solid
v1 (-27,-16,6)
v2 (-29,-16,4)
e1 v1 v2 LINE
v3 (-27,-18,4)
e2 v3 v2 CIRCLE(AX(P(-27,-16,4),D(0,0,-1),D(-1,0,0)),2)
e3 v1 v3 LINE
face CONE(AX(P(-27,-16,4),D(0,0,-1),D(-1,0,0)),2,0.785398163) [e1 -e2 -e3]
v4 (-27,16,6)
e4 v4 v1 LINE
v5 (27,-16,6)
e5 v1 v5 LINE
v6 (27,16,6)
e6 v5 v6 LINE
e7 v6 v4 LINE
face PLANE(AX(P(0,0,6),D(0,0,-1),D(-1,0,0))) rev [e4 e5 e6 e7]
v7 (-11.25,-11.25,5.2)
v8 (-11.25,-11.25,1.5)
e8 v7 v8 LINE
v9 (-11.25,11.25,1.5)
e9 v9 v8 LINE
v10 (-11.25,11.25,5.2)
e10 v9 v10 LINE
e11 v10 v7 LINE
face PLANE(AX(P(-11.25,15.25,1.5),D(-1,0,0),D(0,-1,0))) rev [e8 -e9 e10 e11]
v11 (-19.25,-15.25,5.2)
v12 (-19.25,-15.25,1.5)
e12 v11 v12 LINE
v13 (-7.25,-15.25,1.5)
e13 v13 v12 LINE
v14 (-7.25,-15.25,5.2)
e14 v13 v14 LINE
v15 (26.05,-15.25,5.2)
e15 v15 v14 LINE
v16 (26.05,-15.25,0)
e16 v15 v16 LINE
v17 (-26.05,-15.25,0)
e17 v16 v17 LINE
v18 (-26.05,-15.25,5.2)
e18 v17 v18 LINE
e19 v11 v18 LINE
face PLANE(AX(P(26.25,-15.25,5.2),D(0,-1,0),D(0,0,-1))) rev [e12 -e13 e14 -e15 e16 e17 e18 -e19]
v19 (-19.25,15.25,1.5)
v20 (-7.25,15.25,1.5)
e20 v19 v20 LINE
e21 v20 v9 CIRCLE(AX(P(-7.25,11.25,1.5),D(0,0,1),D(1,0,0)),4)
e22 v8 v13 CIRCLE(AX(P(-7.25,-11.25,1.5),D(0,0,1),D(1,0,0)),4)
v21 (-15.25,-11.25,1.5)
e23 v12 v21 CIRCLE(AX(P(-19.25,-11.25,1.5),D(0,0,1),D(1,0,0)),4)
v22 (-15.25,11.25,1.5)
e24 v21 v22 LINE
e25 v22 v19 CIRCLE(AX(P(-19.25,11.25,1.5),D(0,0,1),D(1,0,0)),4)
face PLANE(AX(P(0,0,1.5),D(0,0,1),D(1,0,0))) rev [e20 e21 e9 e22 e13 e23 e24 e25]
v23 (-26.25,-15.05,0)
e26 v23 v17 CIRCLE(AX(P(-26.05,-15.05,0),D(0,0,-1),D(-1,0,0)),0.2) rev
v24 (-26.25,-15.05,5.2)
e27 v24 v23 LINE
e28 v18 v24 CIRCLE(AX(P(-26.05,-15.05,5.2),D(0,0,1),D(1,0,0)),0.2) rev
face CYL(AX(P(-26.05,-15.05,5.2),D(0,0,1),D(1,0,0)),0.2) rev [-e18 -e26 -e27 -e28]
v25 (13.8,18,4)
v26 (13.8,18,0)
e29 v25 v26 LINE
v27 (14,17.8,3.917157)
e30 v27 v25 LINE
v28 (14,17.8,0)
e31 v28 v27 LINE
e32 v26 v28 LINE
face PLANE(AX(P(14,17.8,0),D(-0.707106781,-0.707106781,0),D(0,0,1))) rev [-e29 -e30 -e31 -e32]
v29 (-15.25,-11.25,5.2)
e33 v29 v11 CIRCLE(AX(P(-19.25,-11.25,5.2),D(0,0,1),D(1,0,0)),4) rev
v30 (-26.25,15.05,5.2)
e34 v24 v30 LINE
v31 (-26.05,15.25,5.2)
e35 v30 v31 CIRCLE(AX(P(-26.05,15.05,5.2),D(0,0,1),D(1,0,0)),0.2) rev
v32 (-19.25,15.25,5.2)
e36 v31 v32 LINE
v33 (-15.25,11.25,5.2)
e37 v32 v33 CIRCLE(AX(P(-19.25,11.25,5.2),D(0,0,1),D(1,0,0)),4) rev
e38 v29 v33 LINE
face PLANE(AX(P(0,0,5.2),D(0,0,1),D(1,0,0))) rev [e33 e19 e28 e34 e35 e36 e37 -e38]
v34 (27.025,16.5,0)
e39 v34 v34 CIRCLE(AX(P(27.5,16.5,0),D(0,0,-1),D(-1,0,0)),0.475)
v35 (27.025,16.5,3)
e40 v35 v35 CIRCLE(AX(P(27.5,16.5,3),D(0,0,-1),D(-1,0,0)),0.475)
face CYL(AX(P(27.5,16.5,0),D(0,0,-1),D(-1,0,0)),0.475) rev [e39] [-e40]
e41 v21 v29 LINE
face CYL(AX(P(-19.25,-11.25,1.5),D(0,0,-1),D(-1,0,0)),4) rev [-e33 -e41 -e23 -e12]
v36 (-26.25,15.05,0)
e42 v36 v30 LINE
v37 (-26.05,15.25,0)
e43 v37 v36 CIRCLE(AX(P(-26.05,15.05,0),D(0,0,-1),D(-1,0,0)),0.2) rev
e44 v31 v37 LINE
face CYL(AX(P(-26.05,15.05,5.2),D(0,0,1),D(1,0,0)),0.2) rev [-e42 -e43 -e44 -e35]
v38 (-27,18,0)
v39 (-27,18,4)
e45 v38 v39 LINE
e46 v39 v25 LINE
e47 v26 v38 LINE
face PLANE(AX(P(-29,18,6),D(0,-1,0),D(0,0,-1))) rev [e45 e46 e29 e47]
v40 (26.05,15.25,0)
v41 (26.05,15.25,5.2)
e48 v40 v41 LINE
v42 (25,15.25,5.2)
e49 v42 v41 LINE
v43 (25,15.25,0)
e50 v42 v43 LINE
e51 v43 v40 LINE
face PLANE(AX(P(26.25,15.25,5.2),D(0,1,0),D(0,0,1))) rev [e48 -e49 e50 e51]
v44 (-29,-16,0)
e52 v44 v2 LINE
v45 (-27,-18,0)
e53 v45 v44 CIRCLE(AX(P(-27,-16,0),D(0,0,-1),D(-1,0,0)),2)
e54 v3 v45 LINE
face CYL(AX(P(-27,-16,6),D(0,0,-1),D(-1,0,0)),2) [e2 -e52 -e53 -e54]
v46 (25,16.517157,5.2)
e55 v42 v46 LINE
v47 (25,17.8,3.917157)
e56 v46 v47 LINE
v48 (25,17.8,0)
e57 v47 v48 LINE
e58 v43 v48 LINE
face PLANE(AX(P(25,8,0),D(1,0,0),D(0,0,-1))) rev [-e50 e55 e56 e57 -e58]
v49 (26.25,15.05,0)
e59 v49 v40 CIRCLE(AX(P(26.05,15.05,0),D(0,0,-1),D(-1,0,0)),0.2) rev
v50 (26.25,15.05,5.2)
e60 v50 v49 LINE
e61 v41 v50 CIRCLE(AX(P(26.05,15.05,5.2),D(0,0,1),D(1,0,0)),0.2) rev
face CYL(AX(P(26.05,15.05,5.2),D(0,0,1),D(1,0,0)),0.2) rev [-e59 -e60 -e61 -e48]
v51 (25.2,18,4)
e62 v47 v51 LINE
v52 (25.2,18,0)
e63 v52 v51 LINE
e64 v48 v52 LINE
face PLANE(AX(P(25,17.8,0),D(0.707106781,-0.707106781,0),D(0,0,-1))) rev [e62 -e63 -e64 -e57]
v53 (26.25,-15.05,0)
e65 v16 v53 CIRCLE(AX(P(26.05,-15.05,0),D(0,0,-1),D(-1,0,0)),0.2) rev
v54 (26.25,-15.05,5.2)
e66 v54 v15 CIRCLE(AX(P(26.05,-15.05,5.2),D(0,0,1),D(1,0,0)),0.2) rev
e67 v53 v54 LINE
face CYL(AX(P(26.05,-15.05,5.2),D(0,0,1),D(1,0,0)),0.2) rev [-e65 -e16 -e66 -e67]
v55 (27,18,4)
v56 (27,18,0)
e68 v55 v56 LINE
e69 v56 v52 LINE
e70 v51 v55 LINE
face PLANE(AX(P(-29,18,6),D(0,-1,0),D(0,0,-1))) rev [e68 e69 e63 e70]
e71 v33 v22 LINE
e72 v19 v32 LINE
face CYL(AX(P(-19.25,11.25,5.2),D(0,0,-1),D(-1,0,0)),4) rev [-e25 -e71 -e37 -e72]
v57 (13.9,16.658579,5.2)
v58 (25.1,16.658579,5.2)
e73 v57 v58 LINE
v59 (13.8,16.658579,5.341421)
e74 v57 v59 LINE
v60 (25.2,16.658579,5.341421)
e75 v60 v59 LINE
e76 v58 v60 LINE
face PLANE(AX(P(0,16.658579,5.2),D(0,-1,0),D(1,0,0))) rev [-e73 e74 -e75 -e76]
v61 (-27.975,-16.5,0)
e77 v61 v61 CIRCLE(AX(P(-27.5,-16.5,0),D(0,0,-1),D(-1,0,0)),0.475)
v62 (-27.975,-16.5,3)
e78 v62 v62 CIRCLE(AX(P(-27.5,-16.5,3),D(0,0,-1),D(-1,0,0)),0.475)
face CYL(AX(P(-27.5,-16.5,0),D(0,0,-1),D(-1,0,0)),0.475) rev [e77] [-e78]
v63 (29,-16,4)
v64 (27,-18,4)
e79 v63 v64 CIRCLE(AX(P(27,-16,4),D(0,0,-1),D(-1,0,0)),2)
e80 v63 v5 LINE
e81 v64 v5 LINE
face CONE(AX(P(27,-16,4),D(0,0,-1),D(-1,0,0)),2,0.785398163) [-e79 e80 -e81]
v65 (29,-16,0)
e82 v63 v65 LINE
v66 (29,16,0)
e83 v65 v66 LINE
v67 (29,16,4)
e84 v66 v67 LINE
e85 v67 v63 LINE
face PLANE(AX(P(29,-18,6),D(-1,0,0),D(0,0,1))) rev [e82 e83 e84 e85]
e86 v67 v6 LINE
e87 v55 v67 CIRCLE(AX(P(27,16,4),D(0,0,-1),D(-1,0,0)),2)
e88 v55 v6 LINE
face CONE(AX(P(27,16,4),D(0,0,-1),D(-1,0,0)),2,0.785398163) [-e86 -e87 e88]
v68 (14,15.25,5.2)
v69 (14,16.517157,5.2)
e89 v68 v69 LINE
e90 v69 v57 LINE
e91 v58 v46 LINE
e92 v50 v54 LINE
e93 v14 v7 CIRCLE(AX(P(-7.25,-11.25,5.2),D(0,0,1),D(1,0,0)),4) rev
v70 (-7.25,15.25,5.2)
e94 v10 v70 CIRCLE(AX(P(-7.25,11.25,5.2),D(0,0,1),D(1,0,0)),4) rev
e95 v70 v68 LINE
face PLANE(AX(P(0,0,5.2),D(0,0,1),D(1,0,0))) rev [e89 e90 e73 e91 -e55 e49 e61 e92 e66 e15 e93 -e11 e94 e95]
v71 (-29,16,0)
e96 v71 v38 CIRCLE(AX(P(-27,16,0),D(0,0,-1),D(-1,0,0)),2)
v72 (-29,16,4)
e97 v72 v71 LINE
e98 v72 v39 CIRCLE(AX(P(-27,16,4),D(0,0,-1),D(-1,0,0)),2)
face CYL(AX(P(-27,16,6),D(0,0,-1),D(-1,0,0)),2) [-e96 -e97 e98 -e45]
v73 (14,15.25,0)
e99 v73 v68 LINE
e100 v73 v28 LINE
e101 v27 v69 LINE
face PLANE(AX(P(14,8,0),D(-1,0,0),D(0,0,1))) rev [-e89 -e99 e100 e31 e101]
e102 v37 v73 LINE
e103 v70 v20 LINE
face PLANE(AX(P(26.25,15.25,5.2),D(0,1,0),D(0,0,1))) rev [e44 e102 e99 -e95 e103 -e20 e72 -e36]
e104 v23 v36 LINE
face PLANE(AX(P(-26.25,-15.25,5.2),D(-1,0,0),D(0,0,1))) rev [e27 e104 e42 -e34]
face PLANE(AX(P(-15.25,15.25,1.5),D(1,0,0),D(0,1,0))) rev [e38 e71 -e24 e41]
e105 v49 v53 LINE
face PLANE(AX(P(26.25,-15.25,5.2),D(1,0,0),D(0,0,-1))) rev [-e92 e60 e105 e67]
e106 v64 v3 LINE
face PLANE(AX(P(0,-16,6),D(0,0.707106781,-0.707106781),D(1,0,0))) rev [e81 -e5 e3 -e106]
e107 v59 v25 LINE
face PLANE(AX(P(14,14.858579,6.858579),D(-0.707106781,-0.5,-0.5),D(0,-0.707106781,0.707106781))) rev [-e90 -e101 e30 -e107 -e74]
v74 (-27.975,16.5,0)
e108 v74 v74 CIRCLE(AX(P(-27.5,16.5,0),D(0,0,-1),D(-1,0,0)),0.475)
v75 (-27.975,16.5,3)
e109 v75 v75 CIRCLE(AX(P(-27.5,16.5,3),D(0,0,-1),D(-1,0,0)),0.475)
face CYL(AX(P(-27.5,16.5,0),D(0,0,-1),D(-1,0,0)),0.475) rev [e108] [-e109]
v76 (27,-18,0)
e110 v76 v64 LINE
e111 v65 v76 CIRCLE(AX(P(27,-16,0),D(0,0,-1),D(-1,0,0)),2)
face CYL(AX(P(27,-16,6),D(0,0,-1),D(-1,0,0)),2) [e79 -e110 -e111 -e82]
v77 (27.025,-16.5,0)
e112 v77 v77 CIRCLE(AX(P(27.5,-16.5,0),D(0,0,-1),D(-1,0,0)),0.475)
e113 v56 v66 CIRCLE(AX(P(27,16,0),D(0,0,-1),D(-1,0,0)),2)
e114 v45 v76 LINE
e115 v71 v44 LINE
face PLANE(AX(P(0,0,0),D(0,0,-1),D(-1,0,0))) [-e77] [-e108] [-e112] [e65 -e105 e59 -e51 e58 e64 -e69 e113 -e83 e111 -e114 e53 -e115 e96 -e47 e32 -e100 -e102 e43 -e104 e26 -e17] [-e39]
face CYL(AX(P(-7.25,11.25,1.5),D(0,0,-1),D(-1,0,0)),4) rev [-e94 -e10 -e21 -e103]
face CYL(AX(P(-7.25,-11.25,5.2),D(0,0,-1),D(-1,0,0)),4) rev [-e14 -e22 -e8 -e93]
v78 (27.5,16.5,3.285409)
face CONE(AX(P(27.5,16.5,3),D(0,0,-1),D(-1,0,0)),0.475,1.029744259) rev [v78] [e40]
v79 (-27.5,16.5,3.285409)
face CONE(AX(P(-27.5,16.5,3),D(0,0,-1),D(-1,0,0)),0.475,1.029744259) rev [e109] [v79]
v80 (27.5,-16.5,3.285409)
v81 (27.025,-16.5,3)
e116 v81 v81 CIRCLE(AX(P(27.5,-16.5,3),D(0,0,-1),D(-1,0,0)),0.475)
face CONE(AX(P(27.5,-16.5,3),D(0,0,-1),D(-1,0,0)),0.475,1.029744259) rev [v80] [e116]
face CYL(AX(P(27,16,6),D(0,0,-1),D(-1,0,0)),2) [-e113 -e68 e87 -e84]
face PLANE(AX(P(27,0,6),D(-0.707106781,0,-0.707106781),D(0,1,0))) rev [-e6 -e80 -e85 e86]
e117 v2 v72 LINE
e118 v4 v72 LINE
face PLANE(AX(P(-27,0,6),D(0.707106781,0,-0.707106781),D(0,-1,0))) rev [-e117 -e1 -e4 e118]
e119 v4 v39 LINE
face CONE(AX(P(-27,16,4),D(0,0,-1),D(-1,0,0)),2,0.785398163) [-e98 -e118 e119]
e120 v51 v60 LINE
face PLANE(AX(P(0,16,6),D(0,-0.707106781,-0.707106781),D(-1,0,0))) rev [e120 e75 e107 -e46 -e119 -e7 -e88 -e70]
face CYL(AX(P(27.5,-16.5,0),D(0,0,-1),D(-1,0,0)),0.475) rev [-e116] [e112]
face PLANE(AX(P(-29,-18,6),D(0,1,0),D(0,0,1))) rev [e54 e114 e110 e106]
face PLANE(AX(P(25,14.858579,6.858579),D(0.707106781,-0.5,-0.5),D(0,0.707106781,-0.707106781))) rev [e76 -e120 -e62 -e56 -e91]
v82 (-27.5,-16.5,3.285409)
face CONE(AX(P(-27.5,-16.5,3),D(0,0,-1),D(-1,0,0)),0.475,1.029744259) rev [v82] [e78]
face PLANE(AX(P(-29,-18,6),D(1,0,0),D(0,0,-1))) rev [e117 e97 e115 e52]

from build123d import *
from OCP.BRepFilletAPI import BRepFilletAPI_MakeChamfer

# Parameters (mm, degrees)
SKETCH_1_W          = 58
SKETCH_1_H          = 36
EXTRUDE_1_DEPTH     = 6
SKETCH_2_W          = 52.5
SKETCH_2_H          = 30.5
CUT_EXTRUDE_1_DEPTH = 5.2
FILLET_1_R          = 2
SKETCH_3_W          = 4
SKETCH_3_H          = 30.5
EXTRUDE_2_DEPTH     = 3.7
FILLET_2_R          = 4
CHAMFER_1_SIZE      = 2
SKETCH_4_W          = 11
SKETCH_4_H          = 5.2
CUT_EXTRUDE_2_DEPTH = 10
FILLET_3_R          = 0.2
CHAMFER_2_SIZE      = 0.2
CHAMFER_2_SIZE_2    = 0.141421356
M1_2X0_25_1_D       = 0.95
M1_2X0_25_1_DEPTH   = 3
M1_2X0_25_1_TIP     = 0.285408794


with BuildPart() as part:
    # 草图1 → 凸台-拉伸1 (new body)
    with BuildSketch(Plane.XY):
        Rectangle(SKETCH_1_W, SKETCH_1_H)
    extrude(amount=EXTRUDE_1_DEPTH)

    # 草图2 → 切除-拉伸1 (cut)
    with BuildSketch(Plane(origin=(0, 0, 0), x_dir=(-1, 0, 0), z_dir=(0, 0, -1))):
        Rectangle(SKETCH_2_W, SKETCH_2_H)
    extrude(amount=-CUT_EXTRUDE_1_DEPTH, mode=Mode.SUBTRACT)

    # 圆角1
    fillet_1_edges = [part.edges().sort_by_distance(p)[0] for p in [
        (29, -18, 3),
        (-29, -18, 3),
        (-29, 18, 3),
        (29, 18, 3),
    ]]
    fillet(fillet_1_edges, radius=FILLET_1_R)

    # 草图3 → 凸台-拉伸2 (add)
    with BuildSketch(Plane(origin=(0, 0, 5.2), x_dir=(-1, 0, 0), z_dir=(0, 0, -1))):
        with Locations((13.25, 0)):
            Rectangle(SKETCH_3_W, SKETCH_3_H)
    extrude(amount=EXTRUDE_2_DEPTH)

    # 圆角2
    fillet_2_edges = [part.edges().sort_by_distance(p)[0] for p in [
        (-15.25, -15.25, 3.35),
        (-15.25, 15.25, 3.35),
        (-11.25, 15.25, 3.35),
        (-11.25, -15.25, 3.35),
    ]]
    fillet(fillet_2_edges, radius=FILLET_2_R)

    # 倒角1
    chamfer_1_edges = [part.edges().sort_by_distance(p)[0] for p in [
        (-29, 0, 6),
        (0, 18, 6),
        (29, 0, 6),
        (0, -18, 6),
        (28.414213562, -17.414213562, 6),
        (28.414213562, 17.414213562, 6),
        (-28.414213562, -17.414213562, 6),
        (-28.414213562, 17.414213562, 6),
    ]]
    chamfer(chamfer_1_edges, length=CHAMFER_1_SIZE)

    # 草图4 → 切除-拉伸2 (cut)
    with BuildSketch(Plane(origin=(0, 18, 0), x_dir=(1, 0, 0), z_dir=(0, 1, 0))):
        with Locations((19.5, -2.6)):
            Rectangle(SKETCH_4_W, SKETCH_4_H)
    extrude(amount=-CUT_EXTRUDE_2_DEPTH, mode=Mode.SUBTRACT)

    # 圆角3
    fillet_3_edges = [part.edges().sort_by_distance(p)[0] for p in [
        (-26.25, 15.25, 2.6),
        (-26.25, -15.25, 2.6),
        (26.25, -15.25, 2.6),
        (26.25, 15.25, 2.6),
    ]]
    fillet(fillet_3_edges, radius=FILLET_3_R)

    # 倒角2
    chamfer_2_edges_1 = [part.edges().sort_by_distance(p)[0] for p in [
        (14, 17.4, 4.6),
        (25, 17.4, 4.6),
        (25, 18, 2),
        (14, 18, 2),
    ]]
    chamfer_2_edges_2 = [part.edges().sort_by_distance(p)[0] for p in [
        (19.5, 16.8, 5.2),
    ]]
    chamfer_2_side_2 = [part.faces().sort_by_distance(p)[0] for p in [
        (19.5, 16.797171573, 5.2),
    ]]
    chamfer_2 = BRepFilletAPI_MakeChamfer(part.part.solid().wrapped)
    for e in chamfer_2_edges_1:
        chamfer_2.Add(CHAMFER_2_SIZE - 0.0001, e.wrapped)
    for e in chamfer_2_edges_2:
        chamfer_2.Add(CHAMFER_2_SIZE_2 - 0.0001, CHAMFER_2_SIZE - 0.0001, e.wrapped, chamfer_2_side_2[0].wrapped)
    add(Compound.cast(chamfer_2.Shape()), mode=Mode.REPLACE)  # a hair under: the kernel refuses the full size

    # M1.2x0.25 螺纹孔1
    with Locations(Plane(origin=(27.5, 16.5, 0), x_dir=(-1, 0, 0), z_dir=(0, 0, -1))):
        with Locations((0, 0), (0, -33), (55, -33), (55, 0)):
            Hole(M1_2X0_25_1_D / 2, depth=M1_2X0_25_1_DEPTH)
            with Locations((0, 0, -(M1_2X0_25_1_DEPTH + M1_2X0_25_1_TIP / 2))):  # 118° drill point
                Cone(0, M1_2X0_25_1_D / 2, M1_2X0_25_1_TIP, mode=Mode.SUBTRACT)


solid = part.part
